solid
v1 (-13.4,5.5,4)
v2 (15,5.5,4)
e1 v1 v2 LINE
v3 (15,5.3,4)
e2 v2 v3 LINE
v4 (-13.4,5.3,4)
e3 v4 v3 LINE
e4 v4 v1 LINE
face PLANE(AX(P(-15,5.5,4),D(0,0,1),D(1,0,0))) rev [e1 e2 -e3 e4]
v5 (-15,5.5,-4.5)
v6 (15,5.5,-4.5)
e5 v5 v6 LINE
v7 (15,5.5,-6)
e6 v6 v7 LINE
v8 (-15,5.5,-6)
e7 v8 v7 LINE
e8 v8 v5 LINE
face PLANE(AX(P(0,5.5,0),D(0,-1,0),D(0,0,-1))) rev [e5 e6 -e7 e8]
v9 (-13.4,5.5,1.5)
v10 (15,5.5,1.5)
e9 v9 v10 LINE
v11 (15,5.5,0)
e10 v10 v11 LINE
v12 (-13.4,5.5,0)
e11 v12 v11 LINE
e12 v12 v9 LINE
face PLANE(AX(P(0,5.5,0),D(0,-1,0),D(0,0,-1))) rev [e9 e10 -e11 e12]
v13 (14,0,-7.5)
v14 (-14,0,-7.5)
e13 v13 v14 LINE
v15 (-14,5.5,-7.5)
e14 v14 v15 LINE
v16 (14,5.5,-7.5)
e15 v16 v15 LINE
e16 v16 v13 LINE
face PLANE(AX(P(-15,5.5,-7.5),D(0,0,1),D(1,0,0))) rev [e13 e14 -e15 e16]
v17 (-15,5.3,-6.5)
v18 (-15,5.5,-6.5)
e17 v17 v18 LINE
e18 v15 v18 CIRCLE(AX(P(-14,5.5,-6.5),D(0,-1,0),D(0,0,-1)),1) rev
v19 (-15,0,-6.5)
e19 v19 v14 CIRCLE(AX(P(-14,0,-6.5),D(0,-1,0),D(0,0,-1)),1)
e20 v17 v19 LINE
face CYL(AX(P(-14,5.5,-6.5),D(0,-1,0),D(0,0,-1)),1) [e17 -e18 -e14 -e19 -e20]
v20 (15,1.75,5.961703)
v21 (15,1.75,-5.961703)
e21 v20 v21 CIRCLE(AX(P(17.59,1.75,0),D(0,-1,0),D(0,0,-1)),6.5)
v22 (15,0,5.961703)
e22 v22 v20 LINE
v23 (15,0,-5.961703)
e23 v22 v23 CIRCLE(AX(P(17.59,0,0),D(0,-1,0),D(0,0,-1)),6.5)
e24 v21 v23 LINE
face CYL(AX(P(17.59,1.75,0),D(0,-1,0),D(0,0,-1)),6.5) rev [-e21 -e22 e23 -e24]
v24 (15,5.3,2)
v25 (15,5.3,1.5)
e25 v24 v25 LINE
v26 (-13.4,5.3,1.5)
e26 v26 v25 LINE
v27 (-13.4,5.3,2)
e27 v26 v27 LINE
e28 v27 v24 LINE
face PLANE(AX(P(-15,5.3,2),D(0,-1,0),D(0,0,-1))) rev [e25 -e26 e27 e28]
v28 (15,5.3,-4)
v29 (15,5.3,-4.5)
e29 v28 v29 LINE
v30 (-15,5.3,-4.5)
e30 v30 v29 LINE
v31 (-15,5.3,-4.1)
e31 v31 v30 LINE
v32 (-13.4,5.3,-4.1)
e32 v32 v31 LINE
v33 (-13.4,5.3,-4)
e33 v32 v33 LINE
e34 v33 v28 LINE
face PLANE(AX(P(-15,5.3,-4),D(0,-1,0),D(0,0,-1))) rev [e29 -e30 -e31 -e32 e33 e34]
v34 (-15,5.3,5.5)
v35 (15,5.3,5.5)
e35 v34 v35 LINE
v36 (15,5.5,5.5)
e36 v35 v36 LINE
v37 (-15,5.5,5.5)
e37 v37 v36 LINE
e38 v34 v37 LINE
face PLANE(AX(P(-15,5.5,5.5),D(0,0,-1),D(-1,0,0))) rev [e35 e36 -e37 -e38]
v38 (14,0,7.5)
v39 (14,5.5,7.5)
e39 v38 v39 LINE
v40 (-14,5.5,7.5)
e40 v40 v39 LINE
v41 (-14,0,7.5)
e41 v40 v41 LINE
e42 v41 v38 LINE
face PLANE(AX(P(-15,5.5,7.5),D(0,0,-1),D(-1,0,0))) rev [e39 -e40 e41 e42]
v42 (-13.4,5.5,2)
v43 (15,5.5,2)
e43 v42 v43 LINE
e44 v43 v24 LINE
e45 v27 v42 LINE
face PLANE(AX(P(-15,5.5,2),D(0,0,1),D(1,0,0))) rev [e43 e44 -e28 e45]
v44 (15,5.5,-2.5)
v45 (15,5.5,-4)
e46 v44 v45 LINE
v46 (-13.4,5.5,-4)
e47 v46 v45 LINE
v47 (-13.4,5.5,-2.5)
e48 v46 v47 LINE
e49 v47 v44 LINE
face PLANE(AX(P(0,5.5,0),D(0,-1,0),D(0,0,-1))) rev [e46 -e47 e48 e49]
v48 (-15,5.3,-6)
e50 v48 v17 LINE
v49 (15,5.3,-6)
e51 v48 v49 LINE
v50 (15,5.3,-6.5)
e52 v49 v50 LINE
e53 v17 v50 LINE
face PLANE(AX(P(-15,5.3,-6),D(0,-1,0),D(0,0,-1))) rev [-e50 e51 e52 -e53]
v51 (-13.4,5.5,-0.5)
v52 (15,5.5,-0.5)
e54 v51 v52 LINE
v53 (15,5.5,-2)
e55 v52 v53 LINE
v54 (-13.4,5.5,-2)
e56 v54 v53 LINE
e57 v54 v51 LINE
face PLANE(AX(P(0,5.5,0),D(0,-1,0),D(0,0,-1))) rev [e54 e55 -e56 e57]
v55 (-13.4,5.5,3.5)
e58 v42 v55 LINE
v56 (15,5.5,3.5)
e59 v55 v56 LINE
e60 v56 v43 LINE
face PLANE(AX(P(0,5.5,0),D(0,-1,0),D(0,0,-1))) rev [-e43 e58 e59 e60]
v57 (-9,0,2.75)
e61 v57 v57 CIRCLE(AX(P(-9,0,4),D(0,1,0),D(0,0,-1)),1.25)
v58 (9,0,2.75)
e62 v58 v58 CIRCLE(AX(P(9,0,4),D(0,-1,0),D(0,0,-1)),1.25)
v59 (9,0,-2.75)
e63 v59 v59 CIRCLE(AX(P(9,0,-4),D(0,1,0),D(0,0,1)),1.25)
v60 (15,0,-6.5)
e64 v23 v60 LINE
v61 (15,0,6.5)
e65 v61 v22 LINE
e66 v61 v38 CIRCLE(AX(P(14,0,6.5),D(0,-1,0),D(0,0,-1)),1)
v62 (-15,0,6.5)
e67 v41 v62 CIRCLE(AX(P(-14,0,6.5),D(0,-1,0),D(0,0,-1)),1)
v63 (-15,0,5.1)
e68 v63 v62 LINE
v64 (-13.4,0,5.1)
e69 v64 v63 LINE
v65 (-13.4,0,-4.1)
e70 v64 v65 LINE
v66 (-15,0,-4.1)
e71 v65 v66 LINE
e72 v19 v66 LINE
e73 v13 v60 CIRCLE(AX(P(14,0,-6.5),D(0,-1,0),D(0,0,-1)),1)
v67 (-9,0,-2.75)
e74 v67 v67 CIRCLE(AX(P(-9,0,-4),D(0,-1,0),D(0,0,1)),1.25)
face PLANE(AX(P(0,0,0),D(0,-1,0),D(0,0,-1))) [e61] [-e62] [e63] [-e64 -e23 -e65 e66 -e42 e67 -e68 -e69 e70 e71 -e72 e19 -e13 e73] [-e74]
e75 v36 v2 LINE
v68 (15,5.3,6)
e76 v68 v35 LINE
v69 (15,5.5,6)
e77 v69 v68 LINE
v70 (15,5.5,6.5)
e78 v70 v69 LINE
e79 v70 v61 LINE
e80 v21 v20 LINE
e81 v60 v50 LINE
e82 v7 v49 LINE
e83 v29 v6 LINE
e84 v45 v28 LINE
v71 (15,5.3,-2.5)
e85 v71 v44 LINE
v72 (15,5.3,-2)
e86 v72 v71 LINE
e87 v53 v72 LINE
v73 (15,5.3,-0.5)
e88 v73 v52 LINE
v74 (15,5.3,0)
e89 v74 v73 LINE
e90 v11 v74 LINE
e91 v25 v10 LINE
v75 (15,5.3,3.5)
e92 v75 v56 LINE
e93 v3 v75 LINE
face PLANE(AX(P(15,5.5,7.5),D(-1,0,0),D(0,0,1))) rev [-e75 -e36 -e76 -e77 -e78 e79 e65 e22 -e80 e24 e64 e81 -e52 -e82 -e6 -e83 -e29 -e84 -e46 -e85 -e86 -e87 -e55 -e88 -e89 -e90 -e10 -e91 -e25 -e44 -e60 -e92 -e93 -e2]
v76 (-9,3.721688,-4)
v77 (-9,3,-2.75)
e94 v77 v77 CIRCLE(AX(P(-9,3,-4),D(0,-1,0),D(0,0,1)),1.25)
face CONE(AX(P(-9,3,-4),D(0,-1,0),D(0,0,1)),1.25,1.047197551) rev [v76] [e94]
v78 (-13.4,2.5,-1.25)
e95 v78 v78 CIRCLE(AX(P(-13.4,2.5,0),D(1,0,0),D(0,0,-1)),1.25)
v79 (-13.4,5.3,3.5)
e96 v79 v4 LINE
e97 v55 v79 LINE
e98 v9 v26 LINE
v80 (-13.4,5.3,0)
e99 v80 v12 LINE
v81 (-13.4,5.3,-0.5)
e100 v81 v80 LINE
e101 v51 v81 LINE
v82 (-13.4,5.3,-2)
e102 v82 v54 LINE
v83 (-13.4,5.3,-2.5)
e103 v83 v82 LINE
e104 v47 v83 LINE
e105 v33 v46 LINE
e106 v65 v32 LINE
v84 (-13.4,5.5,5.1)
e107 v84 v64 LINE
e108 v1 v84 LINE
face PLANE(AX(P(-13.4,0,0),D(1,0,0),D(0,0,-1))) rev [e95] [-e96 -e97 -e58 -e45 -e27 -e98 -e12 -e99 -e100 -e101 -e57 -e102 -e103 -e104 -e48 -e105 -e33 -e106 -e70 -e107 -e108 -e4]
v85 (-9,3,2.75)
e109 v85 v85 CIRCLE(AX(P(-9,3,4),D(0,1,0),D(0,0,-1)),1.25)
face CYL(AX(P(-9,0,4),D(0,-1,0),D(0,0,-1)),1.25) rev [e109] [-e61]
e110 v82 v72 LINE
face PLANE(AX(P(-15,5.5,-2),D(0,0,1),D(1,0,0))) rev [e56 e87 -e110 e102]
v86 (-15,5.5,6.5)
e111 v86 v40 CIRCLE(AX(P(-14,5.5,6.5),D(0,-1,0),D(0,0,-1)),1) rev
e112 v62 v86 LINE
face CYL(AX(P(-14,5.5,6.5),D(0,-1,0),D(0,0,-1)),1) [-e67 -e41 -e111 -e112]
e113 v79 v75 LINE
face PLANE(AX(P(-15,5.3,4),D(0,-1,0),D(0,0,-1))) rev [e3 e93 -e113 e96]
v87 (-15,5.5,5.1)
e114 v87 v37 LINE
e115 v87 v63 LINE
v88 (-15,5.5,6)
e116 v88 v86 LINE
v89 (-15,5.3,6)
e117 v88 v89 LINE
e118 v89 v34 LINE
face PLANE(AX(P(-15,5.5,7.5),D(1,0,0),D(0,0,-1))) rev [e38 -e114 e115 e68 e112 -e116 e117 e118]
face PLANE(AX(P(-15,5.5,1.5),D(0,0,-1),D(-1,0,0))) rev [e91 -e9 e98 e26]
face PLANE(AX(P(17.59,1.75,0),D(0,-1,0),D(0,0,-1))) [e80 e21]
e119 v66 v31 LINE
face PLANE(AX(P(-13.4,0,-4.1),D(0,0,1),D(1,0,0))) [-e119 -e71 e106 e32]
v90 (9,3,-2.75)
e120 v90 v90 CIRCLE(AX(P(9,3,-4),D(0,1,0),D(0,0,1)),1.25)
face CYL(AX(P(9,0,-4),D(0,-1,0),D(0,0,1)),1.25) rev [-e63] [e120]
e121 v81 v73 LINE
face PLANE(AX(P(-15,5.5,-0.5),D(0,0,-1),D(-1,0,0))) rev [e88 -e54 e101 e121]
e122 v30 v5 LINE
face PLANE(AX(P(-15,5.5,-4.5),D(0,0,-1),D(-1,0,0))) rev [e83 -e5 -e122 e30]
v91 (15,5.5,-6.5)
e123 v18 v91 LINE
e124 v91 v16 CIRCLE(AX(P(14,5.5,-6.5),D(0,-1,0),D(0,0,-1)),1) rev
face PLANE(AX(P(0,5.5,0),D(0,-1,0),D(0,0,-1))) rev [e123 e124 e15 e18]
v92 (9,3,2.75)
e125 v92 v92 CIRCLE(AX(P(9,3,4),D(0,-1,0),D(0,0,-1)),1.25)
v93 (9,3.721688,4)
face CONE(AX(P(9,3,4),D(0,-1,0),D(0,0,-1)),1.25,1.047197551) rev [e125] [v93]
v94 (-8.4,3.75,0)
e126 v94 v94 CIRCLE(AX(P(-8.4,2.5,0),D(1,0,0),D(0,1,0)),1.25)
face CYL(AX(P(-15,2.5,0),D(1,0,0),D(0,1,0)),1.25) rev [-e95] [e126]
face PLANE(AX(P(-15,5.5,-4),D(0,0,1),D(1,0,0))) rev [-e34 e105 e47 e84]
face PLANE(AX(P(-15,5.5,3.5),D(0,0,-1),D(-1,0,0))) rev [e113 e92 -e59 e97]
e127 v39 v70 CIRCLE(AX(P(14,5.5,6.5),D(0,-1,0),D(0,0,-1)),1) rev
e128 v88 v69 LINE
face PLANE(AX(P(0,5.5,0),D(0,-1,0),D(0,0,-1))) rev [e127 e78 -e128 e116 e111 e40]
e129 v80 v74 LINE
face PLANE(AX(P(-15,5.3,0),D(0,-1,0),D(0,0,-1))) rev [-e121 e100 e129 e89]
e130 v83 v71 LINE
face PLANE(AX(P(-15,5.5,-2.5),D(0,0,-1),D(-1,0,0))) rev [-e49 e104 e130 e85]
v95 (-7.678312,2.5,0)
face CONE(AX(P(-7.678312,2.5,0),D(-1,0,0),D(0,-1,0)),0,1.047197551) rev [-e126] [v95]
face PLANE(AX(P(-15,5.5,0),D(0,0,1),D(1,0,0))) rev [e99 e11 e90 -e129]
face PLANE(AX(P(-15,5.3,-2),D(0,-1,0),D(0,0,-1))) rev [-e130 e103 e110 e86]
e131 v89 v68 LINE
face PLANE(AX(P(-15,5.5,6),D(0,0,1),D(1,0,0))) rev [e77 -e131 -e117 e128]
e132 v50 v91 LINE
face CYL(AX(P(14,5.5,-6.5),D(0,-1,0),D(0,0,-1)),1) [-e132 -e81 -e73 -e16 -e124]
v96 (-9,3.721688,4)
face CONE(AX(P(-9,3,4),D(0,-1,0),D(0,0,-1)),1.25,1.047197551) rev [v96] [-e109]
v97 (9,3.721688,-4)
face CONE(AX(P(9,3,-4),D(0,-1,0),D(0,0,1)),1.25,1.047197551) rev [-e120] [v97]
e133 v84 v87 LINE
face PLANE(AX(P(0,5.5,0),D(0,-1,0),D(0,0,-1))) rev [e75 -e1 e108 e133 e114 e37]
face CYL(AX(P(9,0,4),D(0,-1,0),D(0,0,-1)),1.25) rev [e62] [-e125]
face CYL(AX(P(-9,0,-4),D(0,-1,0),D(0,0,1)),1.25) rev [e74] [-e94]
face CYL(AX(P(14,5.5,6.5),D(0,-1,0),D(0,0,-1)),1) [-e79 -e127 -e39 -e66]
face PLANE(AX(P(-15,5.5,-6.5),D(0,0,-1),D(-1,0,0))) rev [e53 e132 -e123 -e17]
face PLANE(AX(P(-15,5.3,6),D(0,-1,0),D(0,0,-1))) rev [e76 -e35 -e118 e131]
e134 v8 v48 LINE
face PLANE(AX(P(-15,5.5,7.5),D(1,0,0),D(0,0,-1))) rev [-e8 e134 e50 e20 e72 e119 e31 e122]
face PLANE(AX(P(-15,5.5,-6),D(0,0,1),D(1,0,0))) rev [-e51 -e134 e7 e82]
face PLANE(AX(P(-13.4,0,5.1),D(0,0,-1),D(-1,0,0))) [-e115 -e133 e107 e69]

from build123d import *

# Parameters (mm, degrees)
SKETCH1_W               = 30
SKETCH1_H               = 15
BOSS_EXTRUDE1_DEPTH     = 5.5
CUT_EXTRUDE2_DEPTH      = 18.649362595
CUT_EXTRUDE2_DEPTH_BACK = 18.649362595
SKETCH2_W               = 0.5
SKETCH2_H               = 0.2
SKETCH5_W               = 9.2
SKETCH5_H               = 5.5
CUT_EXTRUDE4_DEPTH      = 1.6
SKETCH7_R               = 6.5
CUT_EXTRUDE6_DEPTH      = 1.75
FILLET1_R               = 1


with BuildPart() as part:
    # Sketch1 → Boss-Extrude1 (new body)
    with BuildSketch(Plane(origin=(0, 0, 0), x_dir=(1, 0, 0), z_dir=(0, 1, 0))):
        Rectangle(SKETCH1_W, SKETCH1_H)
    extrude(amount=BOSS_EXTRUDE1_DEPTH)

    # Sketch2 → Cut-Extrude2 (cut, two sides: drawn at the far end of the back side and taken through both)
    with BuildSketch(Plane(origin=(0, 0, 0), x_dir=(0, 0, -1), z_dir=(1, 0, 0)).offset(-CUT_EXTRUDE2_DEPTH_BACK)):
        with Locations((-5.75, 5.4)):
            Rectangle(SKETCH2_W, SKETCH2_H)
        with Locations((-3.75, 5.4)):
            Rectangle(SKETCH2_W, SKETCH2_H)
        with Locations((-1.75, 5.4)):
            Rectangle(SKETCH2_W, SKETCH2_H)
        with Locations((0.25, 5.4)):
            Rectangle(SKETCH2_W, SKETCH2_H)
        with Locations((2.25, 5.4)):
            Rectangle(SKETCH2_W, SKETCH2_H)
        with Locations((4.25, 5.4)):
            Rectangle(SKETCH2_W, SKETCH2_H)
        with Locations((6.25, 5.4)):
            Rectangle(SKETCH2_W, SKETCH2_H)
    extrude(amount=CUT_EXTRUDE2_DEPTH + CUT_EXTRUDE2_DEPTH_BACK, mode=Mode.SUBTRACT)

    # Sketch8 → Cut-Revolve1 (revolve, cut)
    with BuildSketch(Plane.XY.offset(4), mode=Mode.PRIVATE) as cut_revolve1_sk:
        Polygon((10.25, 0), (10.25, 3), (9, 3.721687836), (9, 0), align=None)
    cut_revolve1 = revolve(cut_revolve1_sk.sketch.rotate(Axis((9, 0, 4), (0, 1, 0)), 90), axis=Axis((9, 0, 4), (0, 1, 0)), mode=Mode.SUBTRACT)

    # Mirror1: Cut-Revolve1 across plane
    add(cut_revolve1.mirror(Plane.XY), mode=Mode.SUBTRACT)

    # Mirror2: Cut-Revolve1 across plane
    add(cut_revolve1.mirror(Plane(origin=(0, 0, 0), x_dir=(0, 0, 1), z_dir=(1, 0, 0))), mode=Mode.SUBTRACT)

    # Mirror2 copy 1 sketch → Mirror2 copy 1 (revolve, cut)
    with BuildSketch(Plane(origin=(0, 0, -4), x_dir=(-1, 0, 0), z_dir=(0, 0, -1))):
        Polygon((10.25, 0), (10.25, 3), (9, 3.721687836), (9, 0), align=None)
    revolve(axis=Axis((-9, 0, -4), (0, 1, 0)), mode=Mode.SUBTRACT)

    # Sketch5 → Cut-Extrude4 (cut)
    with BuildSketch(Plane(origin=(-15, 0, 0), x_dir=(0, 0, -1), z_dir=(1, 0, 0))):
        with Locations((-0.5, 2.75)):
            Rectangle(SKETCH5_W, SKETCH5_H)
    extrude(amount=CUT_EXTRUDE4_DEPTH, mode=Mode.SUBTRACT)

    # Sketch9 → Cut-Revolve2 (revolve, cut)
    with BuildSketch(Plane.XY):
        Polygon((-15, 2.5), (-7.678312164, 2.5), (-8.4, 3.75), (-15, 3.75), align=None)
    revolve(axis=Axis((-15, 2.5, 0), (-1, 0, 0)), mode=Mode.SUBTRACT)

    # Sketch7 → Cut-Extrude6 (cut)
    with BuildSketch(Plane.XZ):
        with Locations((17.59, 0)):
            Circle(SKETCH7_R)
    extrude(amount=-CUT_EXTRUDE6_DEPTH, mode=Mode.SUBTRACT)

    # Fillet1
    fillet1_edges = [part.edges().sort_by_distance(p)[0] for p in [
        (-15, 2.75, -7.5),
        (15, 2.75, -7.5),
        (15, 2.75, 7.5),
        (-15, 2.75, 7.5),
    ]]
    fillet(fillet1_edges, radius=FILLET1_R - 0.0001)  # a hair under: the kernel refuses the full size


solid = part.part
